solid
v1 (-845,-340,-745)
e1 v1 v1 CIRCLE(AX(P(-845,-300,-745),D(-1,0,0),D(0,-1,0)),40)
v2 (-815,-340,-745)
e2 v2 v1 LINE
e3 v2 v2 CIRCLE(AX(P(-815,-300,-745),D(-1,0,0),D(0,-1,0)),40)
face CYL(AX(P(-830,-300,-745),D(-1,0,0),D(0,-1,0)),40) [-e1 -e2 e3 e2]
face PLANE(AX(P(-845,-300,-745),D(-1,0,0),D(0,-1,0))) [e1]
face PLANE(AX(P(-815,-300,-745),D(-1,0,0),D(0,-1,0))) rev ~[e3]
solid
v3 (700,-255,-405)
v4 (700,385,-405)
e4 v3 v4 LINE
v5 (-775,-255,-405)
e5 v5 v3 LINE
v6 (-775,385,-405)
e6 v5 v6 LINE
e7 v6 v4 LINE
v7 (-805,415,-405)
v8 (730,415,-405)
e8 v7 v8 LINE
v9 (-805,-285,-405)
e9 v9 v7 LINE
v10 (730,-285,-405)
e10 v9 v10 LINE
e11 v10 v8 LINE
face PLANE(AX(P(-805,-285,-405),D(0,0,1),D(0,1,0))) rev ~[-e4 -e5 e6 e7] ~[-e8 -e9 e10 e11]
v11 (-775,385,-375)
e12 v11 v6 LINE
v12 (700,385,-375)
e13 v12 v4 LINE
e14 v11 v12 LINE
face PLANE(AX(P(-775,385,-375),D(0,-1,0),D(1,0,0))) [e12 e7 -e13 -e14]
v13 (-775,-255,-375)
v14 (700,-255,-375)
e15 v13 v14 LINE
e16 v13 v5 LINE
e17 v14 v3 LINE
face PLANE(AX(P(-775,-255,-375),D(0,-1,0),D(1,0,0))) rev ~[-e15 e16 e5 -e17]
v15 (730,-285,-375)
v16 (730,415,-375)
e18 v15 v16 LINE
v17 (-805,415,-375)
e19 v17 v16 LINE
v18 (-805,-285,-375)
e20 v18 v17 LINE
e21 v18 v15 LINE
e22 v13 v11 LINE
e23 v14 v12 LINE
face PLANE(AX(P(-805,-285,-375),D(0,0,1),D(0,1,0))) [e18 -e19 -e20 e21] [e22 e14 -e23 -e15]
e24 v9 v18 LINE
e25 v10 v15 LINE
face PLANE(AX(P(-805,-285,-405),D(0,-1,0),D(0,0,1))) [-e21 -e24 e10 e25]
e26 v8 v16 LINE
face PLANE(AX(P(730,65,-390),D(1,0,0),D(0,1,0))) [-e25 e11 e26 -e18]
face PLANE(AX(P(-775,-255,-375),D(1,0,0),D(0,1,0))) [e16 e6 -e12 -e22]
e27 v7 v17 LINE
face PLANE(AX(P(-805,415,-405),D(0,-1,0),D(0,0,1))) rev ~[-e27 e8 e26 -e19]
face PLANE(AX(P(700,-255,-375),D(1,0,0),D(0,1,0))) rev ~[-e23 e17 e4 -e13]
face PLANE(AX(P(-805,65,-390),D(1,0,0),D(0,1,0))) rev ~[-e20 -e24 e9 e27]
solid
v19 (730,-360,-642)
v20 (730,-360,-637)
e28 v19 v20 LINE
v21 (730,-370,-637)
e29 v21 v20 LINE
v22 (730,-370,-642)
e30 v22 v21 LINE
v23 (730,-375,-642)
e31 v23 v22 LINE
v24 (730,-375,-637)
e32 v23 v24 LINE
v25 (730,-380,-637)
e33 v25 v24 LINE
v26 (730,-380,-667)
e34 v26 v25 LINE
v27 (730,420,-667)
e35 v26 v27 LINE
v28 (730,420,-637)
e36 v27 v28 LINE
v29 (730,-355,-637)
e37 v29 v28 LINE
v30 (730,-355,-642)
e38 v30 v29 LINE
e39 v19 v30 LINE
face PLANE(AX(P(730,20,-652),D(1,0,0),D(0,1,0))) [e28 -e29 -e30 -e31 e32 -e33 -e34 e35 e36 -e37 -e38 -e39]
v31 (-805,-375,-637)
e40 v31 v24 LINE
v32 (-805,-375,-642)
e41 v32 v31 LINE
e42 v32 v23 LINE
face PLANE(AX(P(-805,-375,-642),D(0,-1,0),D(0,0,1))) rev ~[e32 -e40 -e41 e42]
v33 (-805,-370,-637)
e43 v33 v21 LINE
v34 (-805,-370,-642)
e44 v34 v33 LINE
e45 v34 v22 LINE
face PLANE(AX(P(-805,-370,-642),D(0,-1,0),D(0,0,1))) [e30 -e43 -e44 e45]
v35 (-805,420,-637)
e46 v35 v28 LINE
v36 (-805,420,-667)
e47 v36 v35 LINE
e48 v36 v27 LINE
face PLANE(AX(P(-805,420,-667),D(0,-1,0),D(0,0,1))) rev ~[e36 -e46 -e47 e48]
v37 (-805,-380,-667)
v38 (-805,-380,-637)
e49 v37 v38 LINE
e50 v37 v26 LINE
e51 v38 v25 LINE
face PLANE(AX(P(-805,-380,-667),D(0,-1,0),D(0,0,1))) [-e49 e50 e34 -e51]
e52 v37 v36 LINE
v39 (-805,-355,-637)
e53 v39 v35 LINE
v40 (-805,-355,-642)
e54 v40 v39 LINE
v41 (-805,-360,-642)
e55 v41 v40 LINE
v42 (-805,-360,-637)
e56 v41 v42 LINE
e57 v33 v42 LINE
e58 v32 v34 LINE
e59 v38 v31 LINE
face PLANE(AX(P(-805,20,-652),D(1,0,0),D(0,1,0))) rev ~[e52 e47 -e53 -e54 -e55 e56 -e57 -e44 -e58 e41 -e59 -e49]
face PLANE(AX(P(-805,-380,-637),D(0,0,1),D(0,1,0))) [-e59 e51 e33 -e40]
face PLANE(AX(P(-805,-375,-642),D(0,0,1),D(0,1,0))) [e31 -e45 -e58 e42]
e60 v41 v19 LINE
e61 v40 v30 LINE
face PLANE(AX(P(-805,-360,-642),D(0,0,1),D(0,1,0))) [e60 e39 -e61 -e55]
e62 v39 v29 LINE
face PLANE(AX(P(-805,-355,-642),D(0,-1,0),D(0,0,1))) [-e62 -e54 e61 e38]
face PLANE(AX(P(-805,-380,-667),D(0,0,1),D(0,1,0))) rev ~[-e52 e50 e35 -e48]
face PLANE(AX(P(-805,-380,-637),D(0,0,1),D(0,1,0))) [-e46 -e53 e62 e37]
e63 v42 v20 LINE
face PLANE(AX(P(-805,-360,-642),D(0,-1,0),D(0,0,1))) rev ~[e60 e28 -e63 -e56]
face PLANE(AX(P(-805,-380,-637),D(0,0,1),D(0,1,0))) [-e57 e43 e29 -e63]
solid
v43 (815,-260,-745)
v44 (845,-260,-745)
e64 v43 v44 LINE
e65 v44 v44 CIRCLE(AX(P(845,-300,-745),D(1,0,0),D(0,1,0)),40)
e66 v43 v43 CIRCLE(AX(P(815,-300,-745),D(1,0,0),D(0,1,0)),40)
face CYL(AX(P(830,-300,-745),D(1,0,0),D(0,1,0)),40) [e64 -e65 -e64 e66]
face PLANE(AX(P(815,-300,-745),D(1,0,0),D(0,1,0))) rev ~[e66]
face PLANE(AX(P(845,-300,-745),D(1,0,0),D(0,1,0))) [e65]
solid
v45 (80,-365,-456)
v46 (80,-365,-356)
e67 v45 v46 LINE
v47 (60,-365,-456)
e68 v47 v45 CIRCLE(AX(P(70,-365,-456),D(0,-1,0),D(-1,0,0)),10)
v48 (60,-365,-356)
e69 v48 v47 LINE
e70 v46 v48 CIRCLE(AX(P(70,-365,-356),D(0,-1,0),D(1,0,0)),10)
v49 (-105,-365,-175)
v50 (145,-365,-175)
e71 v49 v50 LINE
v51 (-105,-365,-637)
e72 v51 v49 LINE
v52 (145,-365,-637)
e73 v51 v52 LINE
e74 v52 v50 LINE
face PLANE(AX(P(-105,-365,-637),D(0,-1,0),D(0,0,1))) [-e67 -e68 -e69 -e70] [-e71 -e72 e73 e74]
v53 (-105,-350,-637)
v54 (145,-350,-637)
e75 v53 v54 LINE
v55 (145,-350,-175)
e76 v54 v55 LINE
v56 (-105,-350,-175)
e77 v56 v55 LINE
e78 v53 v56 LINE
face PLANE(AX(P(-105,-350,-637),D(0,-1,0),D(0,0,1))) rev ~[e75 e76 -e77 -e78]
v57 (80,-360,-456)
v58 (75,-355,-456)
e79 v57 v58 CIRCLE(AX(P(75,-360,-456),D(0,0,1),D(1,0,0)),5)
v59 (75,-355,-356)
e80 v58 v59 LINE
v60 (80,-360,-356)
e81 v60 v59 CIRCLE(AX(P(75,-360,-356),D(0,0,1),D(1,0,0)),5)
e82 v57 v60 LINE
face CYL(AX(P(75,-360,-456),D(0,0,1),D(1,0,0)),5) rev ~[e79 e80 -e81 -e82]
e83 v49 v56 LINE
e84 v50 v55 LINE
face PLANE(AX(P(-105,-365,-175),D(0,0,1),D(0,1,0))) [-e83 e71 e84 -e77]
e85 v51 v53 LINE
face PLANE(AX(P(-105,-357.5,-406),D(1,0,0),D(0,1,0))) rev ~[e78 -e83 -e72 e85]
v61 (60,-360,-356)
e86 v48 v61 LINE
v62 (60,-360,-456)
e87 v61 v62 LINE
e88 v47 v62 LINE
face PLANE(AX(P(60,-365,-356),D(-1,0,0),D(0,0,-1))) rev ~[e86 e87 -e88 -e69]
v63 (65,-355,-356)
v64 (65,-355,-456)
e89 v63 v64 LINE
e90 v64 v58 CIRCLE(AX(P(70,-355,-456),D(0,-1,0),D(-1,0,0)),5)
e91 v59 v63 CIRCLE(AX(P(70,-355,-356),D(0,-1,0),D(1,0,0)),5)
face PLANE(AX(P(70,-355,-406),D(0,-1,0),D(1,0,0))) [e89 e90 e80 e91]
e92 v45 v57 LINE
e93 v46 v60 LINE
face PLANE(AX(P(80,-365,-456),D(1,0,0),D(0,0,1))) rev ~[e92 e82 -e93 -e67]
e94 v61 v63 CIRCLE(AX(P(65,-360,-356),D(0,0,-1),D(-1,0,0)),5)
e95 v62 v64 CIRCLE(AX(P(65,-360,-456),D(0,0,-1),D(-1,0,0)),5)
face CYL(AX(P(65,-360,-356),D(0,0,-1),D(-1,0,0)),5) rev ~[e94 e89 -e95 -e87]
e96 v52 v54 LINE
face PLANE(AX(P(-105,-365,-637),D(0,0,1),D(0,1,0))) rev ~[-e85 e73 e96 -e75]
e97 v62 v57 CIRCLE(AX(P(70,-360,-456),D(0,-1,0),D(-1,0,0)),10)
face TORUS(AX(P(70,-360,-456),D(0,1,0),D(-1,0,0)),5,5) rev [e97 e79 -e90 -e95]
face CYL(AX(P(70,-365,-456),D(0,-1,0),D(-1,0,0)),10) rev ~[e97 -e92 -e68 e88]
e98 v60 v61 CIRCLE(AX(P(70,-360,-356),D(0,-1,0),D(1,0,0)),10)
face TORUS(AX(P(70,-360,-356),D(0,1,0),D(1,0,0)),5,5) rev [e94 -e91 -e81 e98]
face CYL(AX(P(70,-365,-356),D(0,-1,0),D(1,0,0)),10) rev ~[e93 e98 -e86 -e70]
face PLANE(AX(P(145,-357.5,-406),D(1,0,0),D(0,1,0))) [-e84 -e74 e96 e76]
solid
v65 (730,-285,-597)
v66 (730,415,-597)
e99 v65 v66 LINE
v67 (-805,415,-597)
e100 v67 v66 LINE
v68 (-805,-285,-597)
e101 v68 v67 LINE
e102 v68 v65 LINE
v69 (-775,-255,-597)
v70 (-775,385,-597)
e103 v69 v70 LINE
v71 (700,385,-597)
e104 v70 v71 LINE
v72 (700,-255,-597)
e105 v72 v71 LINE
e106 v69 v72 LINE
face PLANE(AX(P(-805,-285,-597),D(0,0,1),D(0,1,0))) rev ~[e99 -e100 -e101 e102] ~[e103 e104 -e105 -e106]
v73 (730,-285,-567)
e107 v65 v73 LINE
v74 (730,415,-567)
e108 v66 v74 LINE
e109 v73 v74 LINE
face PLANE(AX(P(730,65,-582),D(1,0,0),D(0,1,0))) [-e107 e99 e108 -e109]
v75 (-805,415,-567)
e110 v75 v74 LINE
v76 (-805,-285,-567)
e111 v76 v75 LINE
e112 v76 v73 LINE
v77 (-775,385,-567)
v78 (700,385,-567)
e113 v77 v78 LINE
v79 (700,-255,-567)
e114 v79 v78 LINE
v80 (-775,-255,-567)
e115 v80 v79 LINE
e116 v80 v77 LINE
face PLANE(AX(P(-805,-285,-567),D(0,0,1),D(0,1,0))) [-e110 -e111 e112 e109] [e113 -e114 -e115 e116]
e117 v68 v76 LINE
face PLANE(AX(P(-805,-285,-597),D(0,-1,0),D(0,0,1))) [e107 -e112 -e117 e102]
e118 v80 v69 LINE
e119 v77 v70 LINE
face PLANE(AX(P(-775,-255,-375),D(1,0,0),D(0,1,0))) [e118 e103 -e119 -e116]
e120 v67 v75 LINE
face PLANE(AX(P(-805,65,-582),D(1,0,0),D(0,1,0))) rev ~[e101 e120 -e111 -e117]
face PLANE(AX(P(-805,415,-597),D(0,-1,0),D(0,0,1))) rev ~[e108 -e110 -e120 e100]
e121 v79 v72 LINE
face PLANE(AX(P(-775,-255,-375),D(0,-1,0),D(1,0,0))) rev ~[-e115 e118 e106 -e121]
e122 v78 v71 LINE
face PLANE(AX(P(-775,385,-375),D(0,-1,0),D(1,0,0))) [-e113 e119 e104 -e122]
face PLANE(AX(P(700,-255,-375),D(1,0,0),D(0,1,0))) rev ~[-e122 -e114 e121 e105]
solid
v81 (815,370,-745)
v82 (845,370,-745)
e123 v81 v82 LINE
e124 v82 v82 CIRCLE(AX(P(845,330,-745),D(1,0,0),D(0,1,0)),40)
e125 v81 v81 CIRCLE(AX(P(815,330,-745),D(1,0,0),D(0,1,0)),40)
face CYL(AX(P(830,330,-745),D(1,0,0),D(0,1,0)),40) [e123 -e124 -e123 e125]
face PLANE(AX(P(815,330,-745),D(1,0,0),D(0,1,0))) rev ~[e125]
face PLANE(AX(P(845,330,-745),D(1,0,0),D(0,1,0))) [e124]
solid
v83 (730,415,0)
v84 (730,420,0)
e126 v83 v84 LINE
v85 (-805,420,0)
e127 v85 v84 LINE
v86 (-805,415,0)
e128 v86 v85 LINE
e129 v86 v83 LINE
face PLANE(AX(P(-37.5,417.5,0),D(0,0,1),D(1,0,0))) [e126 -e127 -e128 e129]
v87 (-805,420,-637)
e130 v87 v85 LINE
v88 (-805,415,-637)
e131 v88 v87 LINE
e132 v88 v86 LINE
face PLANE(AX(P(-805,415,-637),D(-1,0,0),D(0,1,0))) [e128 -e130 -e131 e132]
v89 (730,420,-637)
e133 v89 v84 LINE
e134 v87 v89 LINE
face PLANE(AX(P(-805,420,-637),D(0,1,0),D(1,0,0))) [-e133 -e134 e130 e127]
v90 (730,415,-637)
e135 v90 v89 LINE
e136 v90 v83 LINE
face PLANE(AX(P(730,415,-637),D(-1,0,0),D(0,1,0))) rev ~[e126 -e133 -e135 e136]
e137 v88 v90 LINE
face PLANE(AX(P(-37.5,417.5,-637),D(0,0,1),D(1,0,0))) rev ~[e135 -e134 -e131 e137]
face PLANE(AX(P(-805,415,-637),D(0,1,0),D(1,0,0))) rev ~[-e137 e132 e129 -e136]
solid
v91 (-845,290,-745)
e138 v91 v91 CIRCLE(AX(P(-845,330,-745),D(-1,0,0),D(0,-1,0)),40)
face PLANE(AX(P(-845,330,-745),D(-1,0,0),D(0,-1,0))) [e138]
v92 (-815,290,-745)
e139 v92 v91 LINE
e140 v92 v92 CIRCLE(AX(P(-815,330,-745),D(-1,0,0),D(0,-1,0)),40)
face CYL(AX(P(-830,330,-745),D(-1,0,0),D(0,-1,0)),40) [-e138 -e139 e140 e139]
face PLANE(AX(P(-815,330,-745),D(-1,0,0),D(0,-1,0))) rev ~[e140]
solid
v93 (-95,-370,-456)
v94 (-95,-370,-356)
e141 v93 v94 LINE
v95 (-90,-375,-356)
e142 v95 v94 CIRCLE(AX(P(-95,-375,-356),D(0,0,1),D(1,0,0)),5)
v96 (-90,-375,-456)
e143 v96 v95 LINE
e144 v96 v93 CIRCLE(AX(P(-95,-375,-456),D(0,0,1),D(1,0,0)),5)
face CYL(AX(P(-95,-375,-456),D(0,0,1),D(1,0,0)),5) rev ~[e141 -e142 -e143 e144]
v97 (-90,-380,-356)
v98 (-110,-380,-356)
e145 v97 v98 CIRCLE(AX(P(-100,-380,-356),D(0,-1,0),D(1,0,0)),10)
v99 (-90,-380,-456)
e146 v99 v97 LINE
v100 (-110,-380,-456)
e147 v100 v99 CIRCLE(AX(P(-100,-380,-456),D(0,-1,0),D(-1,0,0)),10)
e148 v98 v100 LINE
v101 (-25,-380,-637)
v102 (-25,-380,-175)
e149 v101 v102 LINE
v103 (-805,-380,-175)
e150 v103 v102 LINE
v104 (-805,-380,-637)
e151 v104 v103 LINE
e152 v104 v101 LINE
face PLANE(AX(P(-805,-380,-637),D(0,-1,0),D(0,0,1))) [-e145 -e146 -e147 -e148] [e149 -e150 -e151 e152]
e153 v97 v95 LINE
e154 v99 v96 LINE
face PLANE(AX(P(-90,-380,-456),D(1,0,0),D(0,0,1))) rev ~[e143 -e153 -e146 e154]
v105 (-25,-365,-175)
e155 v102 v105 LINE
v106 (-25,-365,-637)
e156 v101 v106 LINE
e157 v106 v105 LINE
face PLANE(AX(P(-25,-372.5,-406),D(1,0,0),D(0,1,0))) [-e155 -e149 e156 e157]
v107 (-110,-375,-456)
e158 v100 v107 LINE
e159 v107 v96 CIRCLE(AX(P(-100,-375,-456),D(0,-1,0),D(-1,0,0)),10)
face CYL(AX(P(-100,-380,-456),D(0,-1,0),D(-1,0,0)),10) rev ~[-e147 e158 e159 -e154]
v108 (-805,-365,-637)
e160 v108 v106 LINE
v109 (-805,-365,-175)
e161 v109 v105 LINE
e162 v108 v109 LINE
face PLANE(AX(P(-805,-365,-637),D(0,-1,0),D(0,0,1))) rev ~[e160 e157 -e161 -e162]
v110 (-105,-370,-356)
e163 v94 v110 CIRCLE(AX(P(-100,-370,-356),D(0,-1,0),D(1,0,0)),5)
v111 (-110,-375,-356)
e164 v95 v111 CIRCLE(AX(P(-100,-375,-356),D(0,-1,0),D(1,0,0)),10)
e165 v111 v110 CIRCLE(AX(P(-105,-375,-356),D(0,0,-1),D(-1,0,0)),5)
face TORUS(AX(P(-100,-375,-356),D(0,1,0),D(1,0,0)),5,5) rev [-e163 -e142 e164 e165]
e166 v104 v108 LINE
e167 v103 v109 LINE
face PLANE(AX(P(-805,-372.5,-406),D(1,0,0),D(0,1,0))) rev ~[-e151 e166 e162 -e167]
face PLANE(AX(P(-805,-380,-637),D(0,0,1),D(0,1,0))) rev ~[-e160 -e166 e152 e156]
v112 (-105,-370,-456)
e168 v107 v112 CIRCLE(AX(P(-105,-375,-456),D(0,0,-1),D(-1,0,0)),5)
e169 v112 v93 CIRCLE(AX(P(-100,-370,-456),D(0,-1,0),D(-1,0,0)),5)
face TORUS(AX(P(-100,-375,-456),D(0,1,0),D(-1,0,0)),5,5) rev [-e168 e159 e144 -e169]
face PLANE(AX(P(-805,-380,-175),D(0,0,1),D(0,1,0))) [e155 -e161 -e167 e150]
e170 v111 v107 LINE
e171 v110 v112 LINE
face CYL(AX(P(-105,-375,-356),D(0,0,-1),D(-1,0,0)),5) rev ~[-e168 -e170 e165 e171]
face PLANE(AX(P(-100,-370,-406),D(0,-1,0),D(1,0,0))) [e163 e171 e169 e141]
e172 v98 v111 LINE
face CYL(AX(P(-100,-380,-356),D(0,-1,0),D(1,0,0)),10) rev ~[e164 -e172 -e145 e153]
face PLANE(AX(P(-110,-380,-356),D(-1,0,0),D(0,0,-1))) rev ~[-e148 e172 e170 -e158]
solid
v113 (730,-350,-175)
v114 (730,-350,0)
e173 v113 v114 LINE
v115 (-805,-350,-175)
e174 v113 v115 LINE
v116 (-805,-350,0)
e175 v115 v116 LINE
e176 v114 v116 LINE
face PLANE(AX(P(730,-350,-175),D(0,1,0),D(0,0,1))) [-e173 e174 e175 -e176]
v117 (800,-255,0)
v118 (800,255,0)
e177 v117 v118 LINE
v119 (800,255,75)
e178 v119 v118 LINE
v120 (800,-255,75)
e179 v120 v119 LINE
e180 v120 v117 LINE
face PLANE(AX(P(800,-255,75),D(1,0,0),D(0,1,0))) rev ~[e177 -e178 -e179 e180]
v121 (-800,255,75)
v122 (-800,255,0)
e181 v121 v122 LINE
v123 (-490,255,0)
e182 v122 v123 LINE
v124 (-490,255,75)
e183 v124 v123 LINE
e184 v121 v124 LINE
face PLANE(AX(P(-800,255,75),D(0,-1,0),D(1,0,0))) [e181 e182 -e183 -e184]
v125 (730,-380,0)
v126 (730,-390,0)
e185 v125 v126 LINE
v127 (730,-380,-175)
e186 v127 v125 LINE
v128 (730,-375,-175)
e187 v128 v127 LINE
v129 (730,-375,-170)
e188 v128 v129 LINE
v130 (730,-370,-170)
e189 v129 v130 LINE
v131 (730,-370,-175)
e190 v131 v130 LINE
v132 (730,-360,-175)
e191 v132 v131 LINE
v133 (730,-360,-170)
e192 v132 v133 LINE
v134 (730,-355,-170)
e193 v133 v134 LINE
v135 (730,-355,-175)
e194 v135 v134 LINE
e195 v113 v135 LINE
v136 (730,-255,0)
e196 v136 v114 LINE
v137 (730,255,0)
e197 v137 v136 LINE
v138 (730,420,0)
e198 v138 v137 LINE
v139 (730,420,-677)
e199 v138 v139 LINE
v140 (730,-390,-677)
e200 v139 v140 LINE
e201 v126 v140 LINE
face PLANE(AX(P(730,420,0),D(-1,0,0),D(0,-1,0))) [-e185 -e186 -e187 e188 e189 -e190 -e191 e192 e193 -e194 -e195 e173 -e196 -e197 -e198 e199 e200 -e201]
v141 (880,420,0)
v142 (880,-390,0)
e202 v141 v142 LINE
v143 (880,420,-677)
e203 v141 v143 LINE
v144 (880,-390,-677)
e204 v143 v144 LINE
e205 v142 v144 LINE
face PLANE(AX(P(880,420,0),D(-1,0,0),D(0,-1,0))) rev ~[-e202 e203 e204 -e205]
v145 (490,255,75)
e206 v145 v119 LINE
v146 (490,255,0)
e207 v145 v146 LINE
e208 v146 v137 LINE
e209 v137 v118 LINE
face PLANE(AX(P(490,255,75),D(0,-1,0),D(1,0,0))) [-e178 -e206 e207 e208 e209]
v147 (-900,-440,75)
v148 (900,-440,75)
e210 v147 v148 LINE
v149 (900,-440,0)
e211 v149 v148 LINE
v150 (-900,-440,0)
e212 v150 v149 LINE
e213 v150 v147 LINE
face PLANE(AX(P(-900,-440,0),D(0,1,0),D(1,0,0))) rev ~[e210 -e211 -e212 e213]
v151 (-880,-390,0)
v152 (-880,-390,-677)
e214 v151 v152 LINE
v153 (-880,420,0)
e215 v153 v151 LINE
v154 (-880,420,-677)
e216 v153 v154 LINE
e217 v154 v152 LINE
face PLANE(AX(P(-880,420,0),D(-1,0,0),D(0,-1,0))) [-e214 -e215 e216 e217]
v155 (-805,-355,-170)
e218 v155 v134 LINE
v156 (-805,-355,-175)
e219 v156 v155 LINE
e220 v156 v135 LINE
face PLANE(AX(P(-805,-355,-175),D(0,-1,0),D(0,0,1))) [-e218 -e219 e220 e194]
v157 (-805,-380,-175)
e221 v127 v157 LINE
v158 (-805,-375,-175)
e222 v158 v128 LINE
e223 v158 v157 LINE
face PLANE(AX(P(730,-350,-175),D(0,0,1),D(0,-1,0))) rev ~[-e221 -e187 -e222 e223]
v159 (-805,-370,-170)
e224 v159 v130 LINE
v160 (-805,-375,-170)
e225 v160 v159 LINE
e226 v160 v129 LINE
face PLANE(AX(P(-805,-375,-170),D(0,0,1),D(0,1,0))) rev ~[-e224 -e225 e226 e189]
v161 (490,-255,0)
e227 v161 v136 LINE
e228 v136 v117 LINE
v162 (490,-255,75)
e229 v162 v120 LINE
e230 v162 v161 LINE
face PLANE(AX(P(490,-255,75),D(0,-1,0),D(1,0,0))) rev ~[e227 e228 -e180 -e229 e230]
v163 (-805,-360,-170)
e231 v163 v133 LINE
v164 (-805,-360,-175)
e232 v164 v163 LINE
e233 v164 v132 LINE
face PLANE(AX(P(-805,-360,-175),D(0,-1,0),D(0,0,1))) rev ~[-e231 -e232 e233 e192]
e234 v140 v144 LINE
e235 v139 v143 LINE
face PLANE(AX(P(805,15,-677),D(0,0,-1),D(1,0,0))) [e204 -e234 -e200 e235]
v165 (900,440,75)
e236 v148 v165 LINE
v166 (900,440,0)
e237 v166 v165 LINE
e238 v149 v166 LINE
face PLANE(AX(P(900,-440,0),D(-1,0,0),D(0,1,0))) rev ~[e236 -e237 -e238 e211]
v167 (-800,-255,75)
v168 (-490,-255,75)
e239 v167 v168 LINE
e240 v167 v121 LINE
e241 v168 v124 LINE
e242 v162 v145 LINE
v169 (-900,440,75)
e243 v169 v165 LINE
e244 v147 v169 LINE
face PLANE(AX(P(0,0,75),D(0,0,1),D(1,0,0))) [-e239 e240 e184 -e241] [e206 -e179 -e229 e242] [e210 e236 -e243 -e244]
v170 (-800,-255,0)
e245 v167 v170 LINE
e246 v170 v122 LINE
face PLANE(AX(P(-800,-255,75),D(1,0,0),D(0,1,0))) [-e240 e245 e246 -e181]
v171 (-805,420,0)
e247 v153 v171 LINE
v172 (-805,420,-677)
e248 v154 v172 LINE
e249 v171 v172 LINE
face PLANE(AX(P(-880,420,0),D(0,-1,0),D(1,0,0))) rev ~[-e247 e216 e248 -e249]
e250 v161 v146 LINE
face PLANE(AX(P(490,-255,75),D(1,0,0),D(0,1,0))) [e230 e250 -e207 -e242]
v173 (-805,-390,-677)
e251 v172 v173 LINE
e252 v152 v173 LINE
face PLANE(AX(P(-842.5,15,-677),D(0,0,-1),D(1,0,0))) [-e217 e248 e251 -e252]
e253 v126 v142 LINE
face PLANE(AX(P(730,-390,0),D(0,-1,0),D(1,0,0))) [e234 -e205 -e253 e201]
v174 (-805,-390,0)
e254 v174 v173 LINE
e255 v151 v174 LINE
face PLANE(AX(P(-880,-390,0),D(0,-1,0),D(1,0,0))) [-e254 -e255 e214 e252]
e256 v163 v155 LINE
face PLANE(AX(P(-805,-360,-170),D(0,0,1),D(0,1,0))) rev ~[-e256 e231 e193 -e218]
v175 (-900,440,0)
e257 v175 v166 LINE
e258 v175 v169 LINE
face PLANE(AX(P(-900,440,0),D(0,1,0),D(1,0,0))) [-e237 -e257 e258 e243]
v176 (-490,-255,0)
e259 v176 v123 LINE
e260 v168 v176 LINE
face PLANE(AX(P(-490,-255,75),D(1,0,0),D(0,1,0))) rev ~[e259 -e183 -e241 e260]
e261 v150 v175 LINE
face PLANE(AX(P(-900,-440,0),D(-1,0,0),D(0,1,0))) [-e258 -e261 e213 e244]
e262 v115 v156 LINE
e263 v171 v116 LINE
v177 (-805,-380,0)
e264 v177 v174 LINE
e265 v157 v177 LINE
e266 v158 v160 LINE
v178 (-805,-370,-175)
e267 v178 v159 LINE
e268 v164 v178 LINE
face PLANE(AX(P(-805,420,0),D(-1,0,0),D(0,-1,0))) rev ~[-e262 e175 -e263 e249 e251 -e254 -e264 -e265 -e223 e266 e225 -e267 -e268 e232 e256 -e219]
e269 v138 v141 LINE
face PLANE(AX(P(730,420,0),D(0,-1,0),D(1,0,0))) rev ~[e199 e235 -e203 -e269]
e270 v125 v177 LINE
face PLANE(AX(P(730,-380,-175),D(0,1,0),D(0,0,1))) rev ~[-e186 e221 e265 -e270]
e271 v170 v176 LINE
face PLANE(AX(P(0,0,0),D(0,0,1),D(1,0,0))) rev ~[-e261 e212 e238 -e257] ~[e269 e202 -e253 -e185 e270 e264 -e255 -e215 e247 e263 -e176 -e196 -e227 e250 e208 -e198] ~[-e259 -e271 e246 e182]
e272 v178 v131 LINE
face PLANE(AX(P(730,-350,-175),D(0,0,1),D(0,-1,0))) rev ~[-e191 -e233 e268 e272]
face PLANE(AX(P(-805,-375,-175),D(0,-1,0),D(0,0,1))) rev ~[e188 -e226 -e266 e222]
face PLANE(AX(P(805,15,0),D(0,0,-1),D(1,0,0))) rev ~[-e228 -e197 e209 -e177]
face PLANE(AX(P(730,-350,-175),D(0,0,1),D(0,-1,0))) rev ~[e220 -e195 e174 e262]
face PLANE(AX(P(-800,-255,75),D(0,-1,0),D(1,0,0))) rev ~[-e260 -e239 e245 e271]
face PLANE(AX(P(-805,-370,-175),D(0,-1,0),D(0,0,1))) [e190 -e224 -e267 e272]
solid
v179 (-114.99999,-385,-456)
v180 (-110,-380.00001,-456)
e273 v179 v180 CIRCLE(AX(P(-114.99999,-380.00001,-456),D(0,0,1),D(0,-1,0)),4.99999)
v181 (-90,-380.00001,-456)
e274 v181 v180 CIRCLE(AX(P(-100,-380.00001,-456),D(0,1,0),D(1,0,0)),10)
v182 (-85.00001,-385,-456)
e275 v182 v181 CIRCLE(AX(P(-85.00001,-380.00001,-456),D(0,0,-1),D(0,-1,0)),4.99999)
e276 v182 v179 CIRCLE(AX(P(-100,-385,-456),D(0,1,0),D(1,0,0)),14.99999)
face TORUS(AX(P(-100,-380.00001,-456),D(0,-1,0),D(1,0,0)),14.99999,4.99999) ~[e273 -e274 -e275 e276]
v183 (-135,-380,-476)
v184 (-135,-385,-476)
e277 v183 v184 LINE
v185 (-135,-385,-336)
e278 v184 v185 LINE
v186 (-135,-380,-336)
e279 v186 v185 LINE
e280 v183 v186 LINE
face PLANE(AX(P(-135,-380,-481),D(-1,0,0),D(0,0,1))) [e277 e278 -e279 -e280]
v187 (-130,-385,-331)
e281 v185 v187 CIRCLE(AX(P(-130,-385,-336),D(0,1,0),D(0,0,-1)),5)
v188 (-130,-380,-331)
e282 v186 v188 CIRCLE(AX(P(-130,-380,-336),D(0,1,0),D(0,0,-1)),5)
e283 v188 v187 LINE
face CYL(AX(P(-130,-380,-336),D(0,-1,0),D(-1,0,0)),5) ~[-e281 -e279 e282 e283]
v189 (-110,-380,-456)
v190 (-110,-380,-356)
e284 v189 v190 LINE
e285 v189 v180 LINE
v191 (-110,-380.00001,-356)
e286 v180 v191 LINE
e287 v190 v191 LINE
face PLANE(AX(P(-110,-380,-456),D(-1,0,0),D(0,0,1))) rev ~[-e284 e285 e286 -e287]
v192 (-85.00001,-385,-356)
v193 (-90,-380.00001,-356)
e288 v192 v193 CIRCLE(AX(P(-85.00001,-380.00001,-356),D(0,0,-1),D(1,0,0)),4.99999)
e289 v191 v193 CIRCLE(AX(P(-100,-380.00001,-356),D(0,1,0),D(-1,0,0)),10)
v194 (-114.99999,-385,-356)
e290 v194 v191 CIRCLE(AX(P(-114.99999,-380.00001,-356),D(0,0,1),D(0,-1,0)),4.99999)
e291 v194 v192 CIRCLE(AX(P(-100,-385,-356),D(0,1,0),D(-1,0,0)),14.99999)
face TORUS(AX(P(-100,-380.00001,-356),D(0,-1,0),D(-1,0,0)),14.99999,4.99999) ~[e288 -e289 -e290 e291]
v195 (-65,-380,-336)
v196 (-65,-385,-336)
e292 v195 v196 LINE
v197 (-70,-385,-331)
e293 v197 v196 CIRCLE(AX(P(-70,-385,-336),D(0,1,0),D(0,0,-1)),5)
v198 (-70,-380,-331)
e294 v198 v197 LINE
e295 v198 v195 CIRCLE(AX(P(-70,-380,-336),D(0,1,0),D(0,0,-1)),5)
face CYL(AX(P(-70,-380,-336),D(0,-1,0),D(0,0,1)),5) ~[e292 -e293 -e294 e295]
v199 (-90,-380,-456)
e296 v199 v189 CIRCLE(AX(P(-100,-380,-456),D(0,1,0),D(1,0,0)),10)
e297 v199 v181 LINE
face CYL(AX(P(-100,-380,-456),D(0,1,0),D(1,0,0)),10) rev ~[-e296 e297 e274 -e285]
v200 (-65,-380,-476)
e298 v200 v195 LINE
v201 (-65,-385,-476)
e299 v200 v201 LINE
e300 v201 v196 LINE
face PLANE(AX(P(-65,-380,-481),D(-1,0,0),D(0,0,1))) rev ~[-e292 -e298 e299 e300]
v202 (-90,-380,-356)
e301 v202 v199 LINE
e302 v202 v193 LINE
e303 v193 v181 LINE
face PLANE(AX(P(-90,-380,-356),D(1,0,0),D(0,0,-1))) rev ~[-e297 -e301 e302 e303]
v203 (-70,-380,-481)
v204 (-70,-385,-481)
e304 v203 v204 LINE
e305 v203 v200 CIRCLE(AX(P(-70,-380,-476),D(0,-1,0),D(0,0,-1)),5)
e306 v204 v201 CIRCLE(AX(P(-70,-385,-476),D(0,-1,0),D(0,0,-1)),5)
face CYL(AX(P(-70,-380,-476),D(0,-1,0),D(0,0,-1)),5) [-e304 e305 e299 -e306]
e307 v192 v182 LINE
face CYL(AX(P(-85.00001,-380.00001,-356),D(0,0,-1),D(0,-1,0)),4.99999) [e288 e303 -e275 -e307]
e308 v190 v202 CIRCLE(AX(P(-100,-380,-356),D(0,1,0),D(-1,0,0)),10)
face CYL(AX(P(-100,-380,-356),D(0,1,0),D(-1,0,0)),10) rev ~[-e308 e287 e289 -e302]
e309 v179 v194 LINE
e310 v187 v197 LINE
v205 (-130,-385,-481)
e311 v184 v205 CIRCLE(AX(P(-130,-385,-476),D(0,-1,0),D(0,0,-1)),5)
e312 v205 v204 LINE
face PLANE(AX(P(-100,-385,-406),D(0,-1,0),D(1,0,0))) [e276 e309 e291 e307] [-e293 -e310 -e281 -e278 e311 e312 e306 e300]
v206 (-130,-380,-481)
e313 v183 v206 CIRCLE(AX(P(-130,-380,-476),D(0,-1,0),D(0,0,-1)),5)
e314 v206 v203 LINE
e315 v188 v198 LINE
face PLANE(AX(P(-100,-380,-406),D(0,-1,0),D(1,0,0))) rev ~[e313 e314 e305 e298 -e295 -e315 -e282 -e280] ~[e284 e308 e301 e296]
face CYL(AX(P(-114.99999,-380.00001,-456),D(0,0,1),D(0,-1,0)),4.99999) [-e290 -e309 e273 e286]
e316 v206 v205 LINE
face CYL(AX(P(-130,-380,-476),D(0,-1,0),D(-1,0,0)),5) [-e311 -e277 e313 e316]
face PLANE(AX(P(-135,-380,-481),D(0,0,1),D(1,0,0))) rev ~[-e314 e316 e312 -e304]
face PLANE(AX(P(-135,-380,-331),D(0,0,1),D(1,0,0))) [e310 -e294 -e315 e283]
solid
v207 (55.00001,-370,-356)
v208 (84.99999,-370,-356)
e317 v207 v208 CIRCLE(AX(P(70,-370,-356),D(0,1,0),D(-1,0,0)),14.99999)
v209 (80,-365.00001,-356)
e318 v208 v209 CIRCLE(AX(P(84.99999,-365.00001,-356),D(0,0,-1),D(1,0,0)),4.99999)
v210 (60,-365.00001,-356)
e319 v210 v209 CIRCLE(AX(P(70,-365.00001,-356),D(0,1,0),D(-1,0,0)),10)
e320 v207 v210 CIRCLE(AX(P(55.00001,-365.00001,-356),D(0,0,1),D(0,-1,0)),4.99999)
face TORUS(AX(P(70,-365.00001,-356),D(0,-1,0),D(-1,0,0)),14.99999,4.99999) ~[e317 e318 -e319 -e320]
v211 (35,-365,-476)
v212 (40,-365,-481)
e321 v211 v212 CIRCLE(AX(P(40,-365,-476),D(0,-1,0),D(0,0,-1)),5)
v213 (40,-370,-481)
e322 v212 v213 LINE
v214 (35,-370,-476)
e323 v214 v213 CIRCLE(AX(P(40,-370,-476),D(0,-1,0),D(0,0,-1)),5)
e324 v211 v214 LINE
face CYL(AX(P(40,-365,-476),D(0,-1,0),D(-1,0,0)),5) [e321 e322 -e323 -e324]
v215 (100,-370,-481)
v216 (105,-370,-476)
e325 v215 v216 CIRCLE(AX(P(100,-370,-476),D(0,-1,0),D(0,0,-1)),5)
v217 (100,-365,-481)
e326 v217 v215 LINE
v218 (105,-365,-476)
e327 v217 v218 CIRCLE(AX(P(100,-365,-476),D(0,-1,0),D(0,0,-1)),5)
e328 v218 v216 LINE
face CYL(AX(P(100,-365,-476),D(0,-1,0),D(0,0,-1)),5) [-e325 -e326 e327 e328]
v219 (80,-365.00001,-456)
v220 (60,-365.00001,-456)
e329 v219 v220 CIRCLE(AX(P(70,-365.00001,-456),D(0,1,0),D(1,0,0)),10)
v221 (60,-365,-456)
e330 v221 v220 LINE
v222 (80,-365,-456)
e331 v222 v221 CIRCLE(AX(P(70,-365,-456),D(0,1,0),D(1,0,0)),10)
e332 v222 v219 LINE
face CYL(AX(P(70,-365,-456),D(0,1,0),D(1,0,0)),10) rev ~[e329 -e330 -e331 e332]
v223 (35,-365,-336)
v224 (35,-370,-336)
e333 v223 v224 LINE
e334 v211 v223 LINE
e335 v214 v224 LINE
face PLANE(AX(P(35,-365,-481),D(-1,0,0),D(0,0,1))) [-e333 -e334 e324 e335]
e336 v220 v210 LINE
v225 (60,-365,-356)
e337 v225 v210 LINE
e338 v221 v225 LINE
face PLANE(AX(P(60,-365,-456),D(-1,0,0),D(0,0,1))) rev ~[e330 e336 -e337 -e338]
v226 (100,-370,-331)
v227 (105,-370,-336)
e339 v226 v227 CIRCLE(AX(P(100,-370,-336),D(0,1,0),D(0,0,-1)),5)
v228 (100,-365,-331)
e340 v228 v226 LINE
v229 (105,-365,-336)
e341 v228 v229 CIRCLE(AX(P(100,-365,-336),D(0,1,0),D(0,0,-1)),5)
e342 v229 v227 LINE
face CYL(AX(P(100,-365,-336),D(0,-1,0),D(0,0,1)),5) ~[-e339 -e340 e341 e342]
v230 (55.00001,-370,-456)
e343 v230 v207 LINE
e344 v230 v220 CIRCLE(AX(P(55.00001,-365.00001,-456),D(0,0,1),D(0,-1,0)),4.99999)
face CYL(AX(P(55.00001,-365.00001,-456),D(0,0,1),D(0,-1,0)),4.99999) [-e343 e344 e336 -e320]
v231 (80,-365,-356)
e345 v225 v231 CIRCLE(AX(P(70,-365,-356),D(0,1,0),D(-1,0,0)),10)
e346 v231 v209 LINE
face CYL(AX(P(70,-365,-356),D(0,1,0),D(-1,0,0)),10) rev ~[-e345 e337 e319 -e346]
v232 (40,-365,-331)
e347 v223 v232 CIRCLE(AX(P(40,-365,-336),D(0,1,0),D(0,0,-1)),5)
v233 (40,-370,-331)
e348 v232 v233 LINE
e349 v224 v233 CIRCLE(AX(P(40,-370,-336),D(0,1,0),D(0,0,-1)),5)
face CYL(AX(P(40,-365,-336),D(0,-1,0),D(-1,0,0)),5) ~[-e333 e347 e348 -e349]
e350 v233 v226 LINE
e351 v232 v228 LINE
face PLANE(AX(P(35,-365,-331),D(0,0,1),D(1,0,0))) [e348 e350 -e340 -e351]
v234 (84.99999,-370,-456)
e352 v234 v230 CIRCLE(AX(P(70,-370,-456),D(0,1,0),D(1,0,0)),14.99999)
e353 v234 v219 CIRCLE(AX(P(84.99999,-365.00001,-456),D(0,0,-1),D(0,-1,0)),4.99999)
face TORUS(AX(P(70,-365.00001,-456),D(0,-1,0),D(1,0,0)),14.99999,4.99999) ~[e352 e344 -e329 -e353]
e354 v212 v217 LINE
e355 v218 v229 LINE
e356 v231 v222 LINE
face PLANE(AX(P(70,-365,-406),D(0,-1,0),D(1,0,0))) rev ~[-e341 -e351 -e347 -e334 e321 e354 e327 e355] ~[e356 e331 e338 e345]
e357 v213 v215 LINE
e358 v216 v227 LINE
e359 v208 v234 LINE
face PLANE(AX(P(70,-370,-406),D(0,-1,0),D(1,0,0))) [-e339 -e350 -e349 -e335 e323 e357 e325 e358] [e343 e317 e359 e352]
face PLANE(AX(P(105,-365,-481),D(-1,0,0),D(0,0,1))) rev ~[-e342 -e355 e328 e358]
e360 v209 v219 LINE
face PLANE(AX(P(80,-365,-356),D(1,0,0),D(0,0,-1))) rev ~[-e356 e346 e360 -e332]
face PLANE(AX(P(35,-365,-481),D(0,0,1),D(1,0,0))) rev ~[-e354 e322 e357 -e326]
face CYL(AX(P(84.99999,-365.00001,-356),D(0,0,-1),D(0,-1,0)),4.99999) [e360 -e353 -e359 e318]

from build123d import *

# Parameters (mm, degrees)
F0_W           = 1800
F0_H           = 880
F1_DEPTH       = 75
F2_W           = 310
F2_H           = 510
F3_DEPTH       = 75.001
F4_W           = 75
F4_H           = 810
F4_W_2         = 150
F5_DEPTH       = 677
F6_W           = 30
F6_H           = 175
F7_DEPTH       = 1535
F8_W           = 800
F8_H           = 30
F9_DEPTH       = 1535
F10_W          = 1535
F10_H          = 5
F11_DEPTH      = 637
F12_W          = 700
F12_H          = 30
F13_DEPTH      = 1535
F14_W          = 1475
F14_H          = 640
F15_DEPTH      = 222
F16_W          = 5
F16_H          = 5
F17_DEPTH      = 1535
F18_W          = 15
F18_H          = 462
F19_DEPTH      = 780
F21_W          = 15
F21_H          = 462
F22_DEPTH      = 250
F23_W          = 70
F23_H          = 150
F24_DEPTH      = 5
F25_R          = 5
F26_DEPTH      = 10
F27_R          = 5
F28_W          = 70
F28_H          = 150
F29_DEPTH      = 5
F30_R          = 5
F31_DEPTH      = 10
F32_R          = 5
F33_R          = 4.99999
F33_2_R        = 4.99999
F35_R          = 40
F36_DEPTH      = 15
F36_DEPTH_BACK = 15
F38_R          = 40
F39_DEPTH      = 15
F39_DEPTH_BACK = 15


# Not quite as in the source:
# - a fillet or chamfer is up to 0.001 mm smaller than in the source, because OpenCascade refuses the exact size


with BuildPart() as f1:
    # F0 (on Top) → F1 (new body)
    with BuildSketch(Plane.XY):
        Rectangle(F0_W, F0_H)
    extrude(amount=F1_DEPTH)

    # F2 (on face) → F3 (cut, through all)
    with BuildSketch(Plane.XY.offset(75)):
        with Locations((-645, 0)):
            Rectangle(F2_W, F2_H)
        with Locations((645, 0)):
            Rectangle(F2_W, F2_H)
    extrude(amount=-F3_DEPTH, mode=Mode.SUBTRACT)

    # F4 (on face) → F5 (join)
    with BuildSketch(Plane(origin=(0, 0, 0), x_dir=(1, 0, 0), z_dir=(0, 0, -1))):
        with Locations((-842.5, -15)):
            Rectangle(F4_W, F4_H)
        with Locations((805, -15)):
            Rectangle(F4_W_2, F4_H)
    extrude(amount=F5_DEPTH)

    # F6 (on face) → F7 (join, through all)
    with BuildSketch(Plane(origin=(730, 0, 0), x_dir=(0, -1, 0), z_dir=(-1, 0, 0))):
        with Locations((365, -87.5)):
            Rectangle(F6_W, F6_H)
    extrude(amount=F7_DEPTH)


with BuildPart() as f9:
    # F8 (on face) → F9 (new body, through all)
    with BuildSketch(Plane.YZ.offset(-805)):
        with Locations((20, -652)):
            Rectangle(F8_W, F8_H)
    extrude(amount=F9_DEPTH)


with BuildPart() as f11:
    # F10 (on face) → F11 (new body, through all)
    with BuildSketch(Plane.XY.offset(-637)):
        with Locations((-37.5, 417.5)):
            Rectangle(F10_W, F10_H)
    extrude(amount=F11_DEPTH)


with BuildPart() as f13:
    # F12 (on face) → F13 (new body, through all)
    with BuildSketch(Plane.YZ.offset(-805)):
        with Locations((65, -390)):
            Rectangle(F12_W, F12_H)
    extrude(amount=F13_DEPTH)


with BuildPart() as f13b:
    # F12 (on face) → F13, piece 2 (new body, through all)
    with BuildSketch(Plane.YZ.offset(-805)):
        with Locations((65, -582)):
            Rectangle(F12_W, F12_H)
    extrude(amount=F13_DEPTH)


with BuildPart() as f15_tool:
    # F14 (on face) → F15 (new body, through all)
    with BuildSketch(Plane.XY.offset(-375)):
        with Locations((-37.5, 65)):
            Rectangle(F14_W, F14_H)
    extrude(amount=-F15_DEPTH)


with BuildPart() as f13_1:
    add(f13.part)

    # F15: cut by f15_tool
    add(f15_tool.part, mode=Mode.SUBTRACT)


with BuildPart() as f13b_1:
    add(f13b.part)

    # F15: cut by f15_tool
    add(f15_tool.part, mode=Mode.SUBTRACT)


with BuildPart() as f17_tool:
    # F16 (on face) → F17 (new body, through all)
    with BuildSketch(Plane.YZ.offset(-805)):
        with Locations((-372.5, -172.5)):
            Rectangle(F16_W, F16_H)
        with Locations((-372.5, -639.5)):
            Rectangle(F16_W, F16_H)
        with Locations((-357.5, -172.5)):
            Rectangle(F16_W, F16_H)
        with Locations((-357.5, -639.5)):
            Rectangle(F16_W, F16_H)
    extrude(amount=F17_DEPTH)


with BuildPart() as f1_1:
    add(f1.part)

    # F17: cut by f17_tool
    add(f17_tool.part, mode=Mode.SUBTRACT)


with BuildPart() as f9_1:
    add(f9.part)

    # F17: cut by f17_tool
    add(f17_tool.part, mode=Mode.SUBTRACT)


with BuildPart() as f19:
    # F18 (on face) → F19 (new body)
    with BuildSketch(Plane.YZ.offset(-805)):
        with Locations((-372.5, -406)):
            Rectangle(F18_W, F18_H)
    extrude(amount=F19_DEPTH)

    # F23 (on face) → F26 (cut)
    with BuildSketch(Plane.XZ.offset(380)):
        with BuildLine():
            ThreePointArc((-90, -356), (-100, -346), (-110, -356))
            Line((-110, -356), (-110, -456))
            ThreePointArc((-110, -456), (-100, -466), (-90, -456))
            Line((-90, -456), (-90, -356))
        make_face()
    extrude(amount=-F26_DEPTH, mode=Mode.SUBTRACT)

    # F27
    f27_edges = [f19.edges().sort_by_distance(p)[0] for p in [
        (-110, -370, -406),
    ]]
    fillet(f27_edges, radius=F27_R)


with BuildPart() as f22:
    # F21 (on offset) → F22 (new body)
    with BuildSketch(Plane.YZ.offset(-105)):
        with Locations((-357.5, -406)):
            Rectangle(F21_W, F21_H)
    extrude(amount=F22_DEPTH)

    # F28 (on face) → F31 (cut)
    with BuildSketch(Plane.XZ.offset(365)):
        with BuildLine():
            ThreePointArc((80, -356), (70, -346), (60, -356))
            Line((60, -356), (60, -456))
            ThreePointArc((60, -456), (70, -466), (80, -456))
            Line((80, -456), (80, -356))
        make_face()
    extrude(amount=-F31_DEPTH, mode=Mode.SUBTRACT)

    # F32
    f32_edges = [f22.edges().sort_by_distance(p)[0] for p in [
        (60, -355, -406),
    ]]
    fillet(f32_edges, radius=F32_R)


with BuildPart() as f24:
    # F23 (on face) → F24 (new body)
    with BuildSketch(Plane.XZ.offset(380)):
        with Locations((-100, -406)):
            Rectangle(F23_W, F23_H)
        with BuildLine():
            Line((-110, -456), (-110, -356))
            ThreePointArc((-110, -356), (-100, -346), (-90, -356))
            Line((-90, -356), (-90, -456))
            ThreePointArc((-90, -456), (-100, -466), (-110, -456))
        make_face(mode=Mode.SUBTRACT)
    extrude(amount=F24_DEPTH)

    # F25
    f25_edges = [f24.edges().sort_by_distance(p)[0] for p in [
        (-135, -382.5, -331),
        (-65, -382.5, -331),
        (-135, -382.5, -481),
        (-65, -382.5, -481),
    ]]
    fillet(f25_edges, radius=F25_R)

    # F33 (radius 5 in the source; OpenCascade refuses exactly that, so slightly less here)
    f33_edges = [f24.edges().sort_by_distance(p)[0] for p in [
        (-110, -385, -406),
    ]]
    fillet(f33_edges, radius=F33_R)


with BuildPart() as f29:
    # F28 (on face) → F29 (new body)
    with BuildSketch(Plane.XZ.offset(365)):
        with Locations((70, -406)):
            Rectangle(F28_W, F28_H)
        with BuildLine():
            Line((60, -456), (60, -356))
            ThreePointArc((60, -356), (70, -346), (80, -356))
            Line((80, -356), (80, -456))
            ThreePointArc((80, -456), (70, -466), (60, -456))
        make_face(mode=Mode.SUBTRACT)
    extrude(amount=F29_DEPTH)

    # F30
    f30_edges = [f29.edges().sort_by_distance(p)[0] for p in [
        (35, -367.5, -331),
        (105, -367.5, -331),
        (35, -367.5, -481),
        (105, -367.5, -481),
    ]]
    fillet(f30_edges, radius=F30_R)

    # F33#2 (radius 5 in the source; OpenCascade refuses exactly that, so slightly less here)
    f33_2_edges = [f29.edges().sort_by_distance(p)[0] for p in [
        (60, -370, -406),
    ]]
    fillet(f33_2_edges, radius=F33_2_R)


with BuildPart() as f36:
    # F35 (on offset) → F36 (new body, two sides)
    with BuildSketch(Plane.YZ.offset(830)) as f36_sk:
        with Locations((-300, -745)):
            Circle(F35_R)
    extrude(amount=F36_DEPTH)
    extrude(f36_sk.sketch, amount=-F36_DEPTH_BACK)


with BuildPart() as f36b:
    # F35 (on offset) → F36, piece 2 (new body, two sides)
    with BuildSketch(Plane.YZ.offset(830)) as f36_2_sk:
        with Locations((330, -745)):
            Circle(F35_R)
    extrude(amount=F36_DEPTH)
    extrude(f36_2_sk.sketch, amount=-F36_DEPTH_BACK)


with BuildPart() as f39:
    # F38 (on offset) → F39 (new body, two sides)
    with BuildSketch(Plane(origin=(-830, 0, 0), x_dir=(0, -1, 0), z_dir=(-1, 0, 0))) as f39_sk:
        with Locations((-330, -745)):
            Circle(F38_R)
    extrude(amount=F39_DEPTH)
    extrude(f39_sk.sketch, amount=-F39_DEPTH_BACK)


with BuildPart() as f39b:
    # F38 (on offset) → F39, piece 2 (new body, two sides)
    with BuildSketch(Plane(origin=(-830, 0, 0), x_dir=(0, -1, 0), z_dir=(-1, 0, 0))) as f39_2_sk:
        with Locations((300, -745)):
            Circle(F38_R)
    extrude(amount=F39_DEPTH)
    extrude(f39_2_sk.sketch, amount=-F39_DEPTH_BACK)


solid = Compound([f11.part, f13_1.part, f13b_1.part, f1_1.part, f9_1.part, f19.part, f22.part, f24.part, f29.part, f36.part, f36b.part, f39.part, f39b.part])
